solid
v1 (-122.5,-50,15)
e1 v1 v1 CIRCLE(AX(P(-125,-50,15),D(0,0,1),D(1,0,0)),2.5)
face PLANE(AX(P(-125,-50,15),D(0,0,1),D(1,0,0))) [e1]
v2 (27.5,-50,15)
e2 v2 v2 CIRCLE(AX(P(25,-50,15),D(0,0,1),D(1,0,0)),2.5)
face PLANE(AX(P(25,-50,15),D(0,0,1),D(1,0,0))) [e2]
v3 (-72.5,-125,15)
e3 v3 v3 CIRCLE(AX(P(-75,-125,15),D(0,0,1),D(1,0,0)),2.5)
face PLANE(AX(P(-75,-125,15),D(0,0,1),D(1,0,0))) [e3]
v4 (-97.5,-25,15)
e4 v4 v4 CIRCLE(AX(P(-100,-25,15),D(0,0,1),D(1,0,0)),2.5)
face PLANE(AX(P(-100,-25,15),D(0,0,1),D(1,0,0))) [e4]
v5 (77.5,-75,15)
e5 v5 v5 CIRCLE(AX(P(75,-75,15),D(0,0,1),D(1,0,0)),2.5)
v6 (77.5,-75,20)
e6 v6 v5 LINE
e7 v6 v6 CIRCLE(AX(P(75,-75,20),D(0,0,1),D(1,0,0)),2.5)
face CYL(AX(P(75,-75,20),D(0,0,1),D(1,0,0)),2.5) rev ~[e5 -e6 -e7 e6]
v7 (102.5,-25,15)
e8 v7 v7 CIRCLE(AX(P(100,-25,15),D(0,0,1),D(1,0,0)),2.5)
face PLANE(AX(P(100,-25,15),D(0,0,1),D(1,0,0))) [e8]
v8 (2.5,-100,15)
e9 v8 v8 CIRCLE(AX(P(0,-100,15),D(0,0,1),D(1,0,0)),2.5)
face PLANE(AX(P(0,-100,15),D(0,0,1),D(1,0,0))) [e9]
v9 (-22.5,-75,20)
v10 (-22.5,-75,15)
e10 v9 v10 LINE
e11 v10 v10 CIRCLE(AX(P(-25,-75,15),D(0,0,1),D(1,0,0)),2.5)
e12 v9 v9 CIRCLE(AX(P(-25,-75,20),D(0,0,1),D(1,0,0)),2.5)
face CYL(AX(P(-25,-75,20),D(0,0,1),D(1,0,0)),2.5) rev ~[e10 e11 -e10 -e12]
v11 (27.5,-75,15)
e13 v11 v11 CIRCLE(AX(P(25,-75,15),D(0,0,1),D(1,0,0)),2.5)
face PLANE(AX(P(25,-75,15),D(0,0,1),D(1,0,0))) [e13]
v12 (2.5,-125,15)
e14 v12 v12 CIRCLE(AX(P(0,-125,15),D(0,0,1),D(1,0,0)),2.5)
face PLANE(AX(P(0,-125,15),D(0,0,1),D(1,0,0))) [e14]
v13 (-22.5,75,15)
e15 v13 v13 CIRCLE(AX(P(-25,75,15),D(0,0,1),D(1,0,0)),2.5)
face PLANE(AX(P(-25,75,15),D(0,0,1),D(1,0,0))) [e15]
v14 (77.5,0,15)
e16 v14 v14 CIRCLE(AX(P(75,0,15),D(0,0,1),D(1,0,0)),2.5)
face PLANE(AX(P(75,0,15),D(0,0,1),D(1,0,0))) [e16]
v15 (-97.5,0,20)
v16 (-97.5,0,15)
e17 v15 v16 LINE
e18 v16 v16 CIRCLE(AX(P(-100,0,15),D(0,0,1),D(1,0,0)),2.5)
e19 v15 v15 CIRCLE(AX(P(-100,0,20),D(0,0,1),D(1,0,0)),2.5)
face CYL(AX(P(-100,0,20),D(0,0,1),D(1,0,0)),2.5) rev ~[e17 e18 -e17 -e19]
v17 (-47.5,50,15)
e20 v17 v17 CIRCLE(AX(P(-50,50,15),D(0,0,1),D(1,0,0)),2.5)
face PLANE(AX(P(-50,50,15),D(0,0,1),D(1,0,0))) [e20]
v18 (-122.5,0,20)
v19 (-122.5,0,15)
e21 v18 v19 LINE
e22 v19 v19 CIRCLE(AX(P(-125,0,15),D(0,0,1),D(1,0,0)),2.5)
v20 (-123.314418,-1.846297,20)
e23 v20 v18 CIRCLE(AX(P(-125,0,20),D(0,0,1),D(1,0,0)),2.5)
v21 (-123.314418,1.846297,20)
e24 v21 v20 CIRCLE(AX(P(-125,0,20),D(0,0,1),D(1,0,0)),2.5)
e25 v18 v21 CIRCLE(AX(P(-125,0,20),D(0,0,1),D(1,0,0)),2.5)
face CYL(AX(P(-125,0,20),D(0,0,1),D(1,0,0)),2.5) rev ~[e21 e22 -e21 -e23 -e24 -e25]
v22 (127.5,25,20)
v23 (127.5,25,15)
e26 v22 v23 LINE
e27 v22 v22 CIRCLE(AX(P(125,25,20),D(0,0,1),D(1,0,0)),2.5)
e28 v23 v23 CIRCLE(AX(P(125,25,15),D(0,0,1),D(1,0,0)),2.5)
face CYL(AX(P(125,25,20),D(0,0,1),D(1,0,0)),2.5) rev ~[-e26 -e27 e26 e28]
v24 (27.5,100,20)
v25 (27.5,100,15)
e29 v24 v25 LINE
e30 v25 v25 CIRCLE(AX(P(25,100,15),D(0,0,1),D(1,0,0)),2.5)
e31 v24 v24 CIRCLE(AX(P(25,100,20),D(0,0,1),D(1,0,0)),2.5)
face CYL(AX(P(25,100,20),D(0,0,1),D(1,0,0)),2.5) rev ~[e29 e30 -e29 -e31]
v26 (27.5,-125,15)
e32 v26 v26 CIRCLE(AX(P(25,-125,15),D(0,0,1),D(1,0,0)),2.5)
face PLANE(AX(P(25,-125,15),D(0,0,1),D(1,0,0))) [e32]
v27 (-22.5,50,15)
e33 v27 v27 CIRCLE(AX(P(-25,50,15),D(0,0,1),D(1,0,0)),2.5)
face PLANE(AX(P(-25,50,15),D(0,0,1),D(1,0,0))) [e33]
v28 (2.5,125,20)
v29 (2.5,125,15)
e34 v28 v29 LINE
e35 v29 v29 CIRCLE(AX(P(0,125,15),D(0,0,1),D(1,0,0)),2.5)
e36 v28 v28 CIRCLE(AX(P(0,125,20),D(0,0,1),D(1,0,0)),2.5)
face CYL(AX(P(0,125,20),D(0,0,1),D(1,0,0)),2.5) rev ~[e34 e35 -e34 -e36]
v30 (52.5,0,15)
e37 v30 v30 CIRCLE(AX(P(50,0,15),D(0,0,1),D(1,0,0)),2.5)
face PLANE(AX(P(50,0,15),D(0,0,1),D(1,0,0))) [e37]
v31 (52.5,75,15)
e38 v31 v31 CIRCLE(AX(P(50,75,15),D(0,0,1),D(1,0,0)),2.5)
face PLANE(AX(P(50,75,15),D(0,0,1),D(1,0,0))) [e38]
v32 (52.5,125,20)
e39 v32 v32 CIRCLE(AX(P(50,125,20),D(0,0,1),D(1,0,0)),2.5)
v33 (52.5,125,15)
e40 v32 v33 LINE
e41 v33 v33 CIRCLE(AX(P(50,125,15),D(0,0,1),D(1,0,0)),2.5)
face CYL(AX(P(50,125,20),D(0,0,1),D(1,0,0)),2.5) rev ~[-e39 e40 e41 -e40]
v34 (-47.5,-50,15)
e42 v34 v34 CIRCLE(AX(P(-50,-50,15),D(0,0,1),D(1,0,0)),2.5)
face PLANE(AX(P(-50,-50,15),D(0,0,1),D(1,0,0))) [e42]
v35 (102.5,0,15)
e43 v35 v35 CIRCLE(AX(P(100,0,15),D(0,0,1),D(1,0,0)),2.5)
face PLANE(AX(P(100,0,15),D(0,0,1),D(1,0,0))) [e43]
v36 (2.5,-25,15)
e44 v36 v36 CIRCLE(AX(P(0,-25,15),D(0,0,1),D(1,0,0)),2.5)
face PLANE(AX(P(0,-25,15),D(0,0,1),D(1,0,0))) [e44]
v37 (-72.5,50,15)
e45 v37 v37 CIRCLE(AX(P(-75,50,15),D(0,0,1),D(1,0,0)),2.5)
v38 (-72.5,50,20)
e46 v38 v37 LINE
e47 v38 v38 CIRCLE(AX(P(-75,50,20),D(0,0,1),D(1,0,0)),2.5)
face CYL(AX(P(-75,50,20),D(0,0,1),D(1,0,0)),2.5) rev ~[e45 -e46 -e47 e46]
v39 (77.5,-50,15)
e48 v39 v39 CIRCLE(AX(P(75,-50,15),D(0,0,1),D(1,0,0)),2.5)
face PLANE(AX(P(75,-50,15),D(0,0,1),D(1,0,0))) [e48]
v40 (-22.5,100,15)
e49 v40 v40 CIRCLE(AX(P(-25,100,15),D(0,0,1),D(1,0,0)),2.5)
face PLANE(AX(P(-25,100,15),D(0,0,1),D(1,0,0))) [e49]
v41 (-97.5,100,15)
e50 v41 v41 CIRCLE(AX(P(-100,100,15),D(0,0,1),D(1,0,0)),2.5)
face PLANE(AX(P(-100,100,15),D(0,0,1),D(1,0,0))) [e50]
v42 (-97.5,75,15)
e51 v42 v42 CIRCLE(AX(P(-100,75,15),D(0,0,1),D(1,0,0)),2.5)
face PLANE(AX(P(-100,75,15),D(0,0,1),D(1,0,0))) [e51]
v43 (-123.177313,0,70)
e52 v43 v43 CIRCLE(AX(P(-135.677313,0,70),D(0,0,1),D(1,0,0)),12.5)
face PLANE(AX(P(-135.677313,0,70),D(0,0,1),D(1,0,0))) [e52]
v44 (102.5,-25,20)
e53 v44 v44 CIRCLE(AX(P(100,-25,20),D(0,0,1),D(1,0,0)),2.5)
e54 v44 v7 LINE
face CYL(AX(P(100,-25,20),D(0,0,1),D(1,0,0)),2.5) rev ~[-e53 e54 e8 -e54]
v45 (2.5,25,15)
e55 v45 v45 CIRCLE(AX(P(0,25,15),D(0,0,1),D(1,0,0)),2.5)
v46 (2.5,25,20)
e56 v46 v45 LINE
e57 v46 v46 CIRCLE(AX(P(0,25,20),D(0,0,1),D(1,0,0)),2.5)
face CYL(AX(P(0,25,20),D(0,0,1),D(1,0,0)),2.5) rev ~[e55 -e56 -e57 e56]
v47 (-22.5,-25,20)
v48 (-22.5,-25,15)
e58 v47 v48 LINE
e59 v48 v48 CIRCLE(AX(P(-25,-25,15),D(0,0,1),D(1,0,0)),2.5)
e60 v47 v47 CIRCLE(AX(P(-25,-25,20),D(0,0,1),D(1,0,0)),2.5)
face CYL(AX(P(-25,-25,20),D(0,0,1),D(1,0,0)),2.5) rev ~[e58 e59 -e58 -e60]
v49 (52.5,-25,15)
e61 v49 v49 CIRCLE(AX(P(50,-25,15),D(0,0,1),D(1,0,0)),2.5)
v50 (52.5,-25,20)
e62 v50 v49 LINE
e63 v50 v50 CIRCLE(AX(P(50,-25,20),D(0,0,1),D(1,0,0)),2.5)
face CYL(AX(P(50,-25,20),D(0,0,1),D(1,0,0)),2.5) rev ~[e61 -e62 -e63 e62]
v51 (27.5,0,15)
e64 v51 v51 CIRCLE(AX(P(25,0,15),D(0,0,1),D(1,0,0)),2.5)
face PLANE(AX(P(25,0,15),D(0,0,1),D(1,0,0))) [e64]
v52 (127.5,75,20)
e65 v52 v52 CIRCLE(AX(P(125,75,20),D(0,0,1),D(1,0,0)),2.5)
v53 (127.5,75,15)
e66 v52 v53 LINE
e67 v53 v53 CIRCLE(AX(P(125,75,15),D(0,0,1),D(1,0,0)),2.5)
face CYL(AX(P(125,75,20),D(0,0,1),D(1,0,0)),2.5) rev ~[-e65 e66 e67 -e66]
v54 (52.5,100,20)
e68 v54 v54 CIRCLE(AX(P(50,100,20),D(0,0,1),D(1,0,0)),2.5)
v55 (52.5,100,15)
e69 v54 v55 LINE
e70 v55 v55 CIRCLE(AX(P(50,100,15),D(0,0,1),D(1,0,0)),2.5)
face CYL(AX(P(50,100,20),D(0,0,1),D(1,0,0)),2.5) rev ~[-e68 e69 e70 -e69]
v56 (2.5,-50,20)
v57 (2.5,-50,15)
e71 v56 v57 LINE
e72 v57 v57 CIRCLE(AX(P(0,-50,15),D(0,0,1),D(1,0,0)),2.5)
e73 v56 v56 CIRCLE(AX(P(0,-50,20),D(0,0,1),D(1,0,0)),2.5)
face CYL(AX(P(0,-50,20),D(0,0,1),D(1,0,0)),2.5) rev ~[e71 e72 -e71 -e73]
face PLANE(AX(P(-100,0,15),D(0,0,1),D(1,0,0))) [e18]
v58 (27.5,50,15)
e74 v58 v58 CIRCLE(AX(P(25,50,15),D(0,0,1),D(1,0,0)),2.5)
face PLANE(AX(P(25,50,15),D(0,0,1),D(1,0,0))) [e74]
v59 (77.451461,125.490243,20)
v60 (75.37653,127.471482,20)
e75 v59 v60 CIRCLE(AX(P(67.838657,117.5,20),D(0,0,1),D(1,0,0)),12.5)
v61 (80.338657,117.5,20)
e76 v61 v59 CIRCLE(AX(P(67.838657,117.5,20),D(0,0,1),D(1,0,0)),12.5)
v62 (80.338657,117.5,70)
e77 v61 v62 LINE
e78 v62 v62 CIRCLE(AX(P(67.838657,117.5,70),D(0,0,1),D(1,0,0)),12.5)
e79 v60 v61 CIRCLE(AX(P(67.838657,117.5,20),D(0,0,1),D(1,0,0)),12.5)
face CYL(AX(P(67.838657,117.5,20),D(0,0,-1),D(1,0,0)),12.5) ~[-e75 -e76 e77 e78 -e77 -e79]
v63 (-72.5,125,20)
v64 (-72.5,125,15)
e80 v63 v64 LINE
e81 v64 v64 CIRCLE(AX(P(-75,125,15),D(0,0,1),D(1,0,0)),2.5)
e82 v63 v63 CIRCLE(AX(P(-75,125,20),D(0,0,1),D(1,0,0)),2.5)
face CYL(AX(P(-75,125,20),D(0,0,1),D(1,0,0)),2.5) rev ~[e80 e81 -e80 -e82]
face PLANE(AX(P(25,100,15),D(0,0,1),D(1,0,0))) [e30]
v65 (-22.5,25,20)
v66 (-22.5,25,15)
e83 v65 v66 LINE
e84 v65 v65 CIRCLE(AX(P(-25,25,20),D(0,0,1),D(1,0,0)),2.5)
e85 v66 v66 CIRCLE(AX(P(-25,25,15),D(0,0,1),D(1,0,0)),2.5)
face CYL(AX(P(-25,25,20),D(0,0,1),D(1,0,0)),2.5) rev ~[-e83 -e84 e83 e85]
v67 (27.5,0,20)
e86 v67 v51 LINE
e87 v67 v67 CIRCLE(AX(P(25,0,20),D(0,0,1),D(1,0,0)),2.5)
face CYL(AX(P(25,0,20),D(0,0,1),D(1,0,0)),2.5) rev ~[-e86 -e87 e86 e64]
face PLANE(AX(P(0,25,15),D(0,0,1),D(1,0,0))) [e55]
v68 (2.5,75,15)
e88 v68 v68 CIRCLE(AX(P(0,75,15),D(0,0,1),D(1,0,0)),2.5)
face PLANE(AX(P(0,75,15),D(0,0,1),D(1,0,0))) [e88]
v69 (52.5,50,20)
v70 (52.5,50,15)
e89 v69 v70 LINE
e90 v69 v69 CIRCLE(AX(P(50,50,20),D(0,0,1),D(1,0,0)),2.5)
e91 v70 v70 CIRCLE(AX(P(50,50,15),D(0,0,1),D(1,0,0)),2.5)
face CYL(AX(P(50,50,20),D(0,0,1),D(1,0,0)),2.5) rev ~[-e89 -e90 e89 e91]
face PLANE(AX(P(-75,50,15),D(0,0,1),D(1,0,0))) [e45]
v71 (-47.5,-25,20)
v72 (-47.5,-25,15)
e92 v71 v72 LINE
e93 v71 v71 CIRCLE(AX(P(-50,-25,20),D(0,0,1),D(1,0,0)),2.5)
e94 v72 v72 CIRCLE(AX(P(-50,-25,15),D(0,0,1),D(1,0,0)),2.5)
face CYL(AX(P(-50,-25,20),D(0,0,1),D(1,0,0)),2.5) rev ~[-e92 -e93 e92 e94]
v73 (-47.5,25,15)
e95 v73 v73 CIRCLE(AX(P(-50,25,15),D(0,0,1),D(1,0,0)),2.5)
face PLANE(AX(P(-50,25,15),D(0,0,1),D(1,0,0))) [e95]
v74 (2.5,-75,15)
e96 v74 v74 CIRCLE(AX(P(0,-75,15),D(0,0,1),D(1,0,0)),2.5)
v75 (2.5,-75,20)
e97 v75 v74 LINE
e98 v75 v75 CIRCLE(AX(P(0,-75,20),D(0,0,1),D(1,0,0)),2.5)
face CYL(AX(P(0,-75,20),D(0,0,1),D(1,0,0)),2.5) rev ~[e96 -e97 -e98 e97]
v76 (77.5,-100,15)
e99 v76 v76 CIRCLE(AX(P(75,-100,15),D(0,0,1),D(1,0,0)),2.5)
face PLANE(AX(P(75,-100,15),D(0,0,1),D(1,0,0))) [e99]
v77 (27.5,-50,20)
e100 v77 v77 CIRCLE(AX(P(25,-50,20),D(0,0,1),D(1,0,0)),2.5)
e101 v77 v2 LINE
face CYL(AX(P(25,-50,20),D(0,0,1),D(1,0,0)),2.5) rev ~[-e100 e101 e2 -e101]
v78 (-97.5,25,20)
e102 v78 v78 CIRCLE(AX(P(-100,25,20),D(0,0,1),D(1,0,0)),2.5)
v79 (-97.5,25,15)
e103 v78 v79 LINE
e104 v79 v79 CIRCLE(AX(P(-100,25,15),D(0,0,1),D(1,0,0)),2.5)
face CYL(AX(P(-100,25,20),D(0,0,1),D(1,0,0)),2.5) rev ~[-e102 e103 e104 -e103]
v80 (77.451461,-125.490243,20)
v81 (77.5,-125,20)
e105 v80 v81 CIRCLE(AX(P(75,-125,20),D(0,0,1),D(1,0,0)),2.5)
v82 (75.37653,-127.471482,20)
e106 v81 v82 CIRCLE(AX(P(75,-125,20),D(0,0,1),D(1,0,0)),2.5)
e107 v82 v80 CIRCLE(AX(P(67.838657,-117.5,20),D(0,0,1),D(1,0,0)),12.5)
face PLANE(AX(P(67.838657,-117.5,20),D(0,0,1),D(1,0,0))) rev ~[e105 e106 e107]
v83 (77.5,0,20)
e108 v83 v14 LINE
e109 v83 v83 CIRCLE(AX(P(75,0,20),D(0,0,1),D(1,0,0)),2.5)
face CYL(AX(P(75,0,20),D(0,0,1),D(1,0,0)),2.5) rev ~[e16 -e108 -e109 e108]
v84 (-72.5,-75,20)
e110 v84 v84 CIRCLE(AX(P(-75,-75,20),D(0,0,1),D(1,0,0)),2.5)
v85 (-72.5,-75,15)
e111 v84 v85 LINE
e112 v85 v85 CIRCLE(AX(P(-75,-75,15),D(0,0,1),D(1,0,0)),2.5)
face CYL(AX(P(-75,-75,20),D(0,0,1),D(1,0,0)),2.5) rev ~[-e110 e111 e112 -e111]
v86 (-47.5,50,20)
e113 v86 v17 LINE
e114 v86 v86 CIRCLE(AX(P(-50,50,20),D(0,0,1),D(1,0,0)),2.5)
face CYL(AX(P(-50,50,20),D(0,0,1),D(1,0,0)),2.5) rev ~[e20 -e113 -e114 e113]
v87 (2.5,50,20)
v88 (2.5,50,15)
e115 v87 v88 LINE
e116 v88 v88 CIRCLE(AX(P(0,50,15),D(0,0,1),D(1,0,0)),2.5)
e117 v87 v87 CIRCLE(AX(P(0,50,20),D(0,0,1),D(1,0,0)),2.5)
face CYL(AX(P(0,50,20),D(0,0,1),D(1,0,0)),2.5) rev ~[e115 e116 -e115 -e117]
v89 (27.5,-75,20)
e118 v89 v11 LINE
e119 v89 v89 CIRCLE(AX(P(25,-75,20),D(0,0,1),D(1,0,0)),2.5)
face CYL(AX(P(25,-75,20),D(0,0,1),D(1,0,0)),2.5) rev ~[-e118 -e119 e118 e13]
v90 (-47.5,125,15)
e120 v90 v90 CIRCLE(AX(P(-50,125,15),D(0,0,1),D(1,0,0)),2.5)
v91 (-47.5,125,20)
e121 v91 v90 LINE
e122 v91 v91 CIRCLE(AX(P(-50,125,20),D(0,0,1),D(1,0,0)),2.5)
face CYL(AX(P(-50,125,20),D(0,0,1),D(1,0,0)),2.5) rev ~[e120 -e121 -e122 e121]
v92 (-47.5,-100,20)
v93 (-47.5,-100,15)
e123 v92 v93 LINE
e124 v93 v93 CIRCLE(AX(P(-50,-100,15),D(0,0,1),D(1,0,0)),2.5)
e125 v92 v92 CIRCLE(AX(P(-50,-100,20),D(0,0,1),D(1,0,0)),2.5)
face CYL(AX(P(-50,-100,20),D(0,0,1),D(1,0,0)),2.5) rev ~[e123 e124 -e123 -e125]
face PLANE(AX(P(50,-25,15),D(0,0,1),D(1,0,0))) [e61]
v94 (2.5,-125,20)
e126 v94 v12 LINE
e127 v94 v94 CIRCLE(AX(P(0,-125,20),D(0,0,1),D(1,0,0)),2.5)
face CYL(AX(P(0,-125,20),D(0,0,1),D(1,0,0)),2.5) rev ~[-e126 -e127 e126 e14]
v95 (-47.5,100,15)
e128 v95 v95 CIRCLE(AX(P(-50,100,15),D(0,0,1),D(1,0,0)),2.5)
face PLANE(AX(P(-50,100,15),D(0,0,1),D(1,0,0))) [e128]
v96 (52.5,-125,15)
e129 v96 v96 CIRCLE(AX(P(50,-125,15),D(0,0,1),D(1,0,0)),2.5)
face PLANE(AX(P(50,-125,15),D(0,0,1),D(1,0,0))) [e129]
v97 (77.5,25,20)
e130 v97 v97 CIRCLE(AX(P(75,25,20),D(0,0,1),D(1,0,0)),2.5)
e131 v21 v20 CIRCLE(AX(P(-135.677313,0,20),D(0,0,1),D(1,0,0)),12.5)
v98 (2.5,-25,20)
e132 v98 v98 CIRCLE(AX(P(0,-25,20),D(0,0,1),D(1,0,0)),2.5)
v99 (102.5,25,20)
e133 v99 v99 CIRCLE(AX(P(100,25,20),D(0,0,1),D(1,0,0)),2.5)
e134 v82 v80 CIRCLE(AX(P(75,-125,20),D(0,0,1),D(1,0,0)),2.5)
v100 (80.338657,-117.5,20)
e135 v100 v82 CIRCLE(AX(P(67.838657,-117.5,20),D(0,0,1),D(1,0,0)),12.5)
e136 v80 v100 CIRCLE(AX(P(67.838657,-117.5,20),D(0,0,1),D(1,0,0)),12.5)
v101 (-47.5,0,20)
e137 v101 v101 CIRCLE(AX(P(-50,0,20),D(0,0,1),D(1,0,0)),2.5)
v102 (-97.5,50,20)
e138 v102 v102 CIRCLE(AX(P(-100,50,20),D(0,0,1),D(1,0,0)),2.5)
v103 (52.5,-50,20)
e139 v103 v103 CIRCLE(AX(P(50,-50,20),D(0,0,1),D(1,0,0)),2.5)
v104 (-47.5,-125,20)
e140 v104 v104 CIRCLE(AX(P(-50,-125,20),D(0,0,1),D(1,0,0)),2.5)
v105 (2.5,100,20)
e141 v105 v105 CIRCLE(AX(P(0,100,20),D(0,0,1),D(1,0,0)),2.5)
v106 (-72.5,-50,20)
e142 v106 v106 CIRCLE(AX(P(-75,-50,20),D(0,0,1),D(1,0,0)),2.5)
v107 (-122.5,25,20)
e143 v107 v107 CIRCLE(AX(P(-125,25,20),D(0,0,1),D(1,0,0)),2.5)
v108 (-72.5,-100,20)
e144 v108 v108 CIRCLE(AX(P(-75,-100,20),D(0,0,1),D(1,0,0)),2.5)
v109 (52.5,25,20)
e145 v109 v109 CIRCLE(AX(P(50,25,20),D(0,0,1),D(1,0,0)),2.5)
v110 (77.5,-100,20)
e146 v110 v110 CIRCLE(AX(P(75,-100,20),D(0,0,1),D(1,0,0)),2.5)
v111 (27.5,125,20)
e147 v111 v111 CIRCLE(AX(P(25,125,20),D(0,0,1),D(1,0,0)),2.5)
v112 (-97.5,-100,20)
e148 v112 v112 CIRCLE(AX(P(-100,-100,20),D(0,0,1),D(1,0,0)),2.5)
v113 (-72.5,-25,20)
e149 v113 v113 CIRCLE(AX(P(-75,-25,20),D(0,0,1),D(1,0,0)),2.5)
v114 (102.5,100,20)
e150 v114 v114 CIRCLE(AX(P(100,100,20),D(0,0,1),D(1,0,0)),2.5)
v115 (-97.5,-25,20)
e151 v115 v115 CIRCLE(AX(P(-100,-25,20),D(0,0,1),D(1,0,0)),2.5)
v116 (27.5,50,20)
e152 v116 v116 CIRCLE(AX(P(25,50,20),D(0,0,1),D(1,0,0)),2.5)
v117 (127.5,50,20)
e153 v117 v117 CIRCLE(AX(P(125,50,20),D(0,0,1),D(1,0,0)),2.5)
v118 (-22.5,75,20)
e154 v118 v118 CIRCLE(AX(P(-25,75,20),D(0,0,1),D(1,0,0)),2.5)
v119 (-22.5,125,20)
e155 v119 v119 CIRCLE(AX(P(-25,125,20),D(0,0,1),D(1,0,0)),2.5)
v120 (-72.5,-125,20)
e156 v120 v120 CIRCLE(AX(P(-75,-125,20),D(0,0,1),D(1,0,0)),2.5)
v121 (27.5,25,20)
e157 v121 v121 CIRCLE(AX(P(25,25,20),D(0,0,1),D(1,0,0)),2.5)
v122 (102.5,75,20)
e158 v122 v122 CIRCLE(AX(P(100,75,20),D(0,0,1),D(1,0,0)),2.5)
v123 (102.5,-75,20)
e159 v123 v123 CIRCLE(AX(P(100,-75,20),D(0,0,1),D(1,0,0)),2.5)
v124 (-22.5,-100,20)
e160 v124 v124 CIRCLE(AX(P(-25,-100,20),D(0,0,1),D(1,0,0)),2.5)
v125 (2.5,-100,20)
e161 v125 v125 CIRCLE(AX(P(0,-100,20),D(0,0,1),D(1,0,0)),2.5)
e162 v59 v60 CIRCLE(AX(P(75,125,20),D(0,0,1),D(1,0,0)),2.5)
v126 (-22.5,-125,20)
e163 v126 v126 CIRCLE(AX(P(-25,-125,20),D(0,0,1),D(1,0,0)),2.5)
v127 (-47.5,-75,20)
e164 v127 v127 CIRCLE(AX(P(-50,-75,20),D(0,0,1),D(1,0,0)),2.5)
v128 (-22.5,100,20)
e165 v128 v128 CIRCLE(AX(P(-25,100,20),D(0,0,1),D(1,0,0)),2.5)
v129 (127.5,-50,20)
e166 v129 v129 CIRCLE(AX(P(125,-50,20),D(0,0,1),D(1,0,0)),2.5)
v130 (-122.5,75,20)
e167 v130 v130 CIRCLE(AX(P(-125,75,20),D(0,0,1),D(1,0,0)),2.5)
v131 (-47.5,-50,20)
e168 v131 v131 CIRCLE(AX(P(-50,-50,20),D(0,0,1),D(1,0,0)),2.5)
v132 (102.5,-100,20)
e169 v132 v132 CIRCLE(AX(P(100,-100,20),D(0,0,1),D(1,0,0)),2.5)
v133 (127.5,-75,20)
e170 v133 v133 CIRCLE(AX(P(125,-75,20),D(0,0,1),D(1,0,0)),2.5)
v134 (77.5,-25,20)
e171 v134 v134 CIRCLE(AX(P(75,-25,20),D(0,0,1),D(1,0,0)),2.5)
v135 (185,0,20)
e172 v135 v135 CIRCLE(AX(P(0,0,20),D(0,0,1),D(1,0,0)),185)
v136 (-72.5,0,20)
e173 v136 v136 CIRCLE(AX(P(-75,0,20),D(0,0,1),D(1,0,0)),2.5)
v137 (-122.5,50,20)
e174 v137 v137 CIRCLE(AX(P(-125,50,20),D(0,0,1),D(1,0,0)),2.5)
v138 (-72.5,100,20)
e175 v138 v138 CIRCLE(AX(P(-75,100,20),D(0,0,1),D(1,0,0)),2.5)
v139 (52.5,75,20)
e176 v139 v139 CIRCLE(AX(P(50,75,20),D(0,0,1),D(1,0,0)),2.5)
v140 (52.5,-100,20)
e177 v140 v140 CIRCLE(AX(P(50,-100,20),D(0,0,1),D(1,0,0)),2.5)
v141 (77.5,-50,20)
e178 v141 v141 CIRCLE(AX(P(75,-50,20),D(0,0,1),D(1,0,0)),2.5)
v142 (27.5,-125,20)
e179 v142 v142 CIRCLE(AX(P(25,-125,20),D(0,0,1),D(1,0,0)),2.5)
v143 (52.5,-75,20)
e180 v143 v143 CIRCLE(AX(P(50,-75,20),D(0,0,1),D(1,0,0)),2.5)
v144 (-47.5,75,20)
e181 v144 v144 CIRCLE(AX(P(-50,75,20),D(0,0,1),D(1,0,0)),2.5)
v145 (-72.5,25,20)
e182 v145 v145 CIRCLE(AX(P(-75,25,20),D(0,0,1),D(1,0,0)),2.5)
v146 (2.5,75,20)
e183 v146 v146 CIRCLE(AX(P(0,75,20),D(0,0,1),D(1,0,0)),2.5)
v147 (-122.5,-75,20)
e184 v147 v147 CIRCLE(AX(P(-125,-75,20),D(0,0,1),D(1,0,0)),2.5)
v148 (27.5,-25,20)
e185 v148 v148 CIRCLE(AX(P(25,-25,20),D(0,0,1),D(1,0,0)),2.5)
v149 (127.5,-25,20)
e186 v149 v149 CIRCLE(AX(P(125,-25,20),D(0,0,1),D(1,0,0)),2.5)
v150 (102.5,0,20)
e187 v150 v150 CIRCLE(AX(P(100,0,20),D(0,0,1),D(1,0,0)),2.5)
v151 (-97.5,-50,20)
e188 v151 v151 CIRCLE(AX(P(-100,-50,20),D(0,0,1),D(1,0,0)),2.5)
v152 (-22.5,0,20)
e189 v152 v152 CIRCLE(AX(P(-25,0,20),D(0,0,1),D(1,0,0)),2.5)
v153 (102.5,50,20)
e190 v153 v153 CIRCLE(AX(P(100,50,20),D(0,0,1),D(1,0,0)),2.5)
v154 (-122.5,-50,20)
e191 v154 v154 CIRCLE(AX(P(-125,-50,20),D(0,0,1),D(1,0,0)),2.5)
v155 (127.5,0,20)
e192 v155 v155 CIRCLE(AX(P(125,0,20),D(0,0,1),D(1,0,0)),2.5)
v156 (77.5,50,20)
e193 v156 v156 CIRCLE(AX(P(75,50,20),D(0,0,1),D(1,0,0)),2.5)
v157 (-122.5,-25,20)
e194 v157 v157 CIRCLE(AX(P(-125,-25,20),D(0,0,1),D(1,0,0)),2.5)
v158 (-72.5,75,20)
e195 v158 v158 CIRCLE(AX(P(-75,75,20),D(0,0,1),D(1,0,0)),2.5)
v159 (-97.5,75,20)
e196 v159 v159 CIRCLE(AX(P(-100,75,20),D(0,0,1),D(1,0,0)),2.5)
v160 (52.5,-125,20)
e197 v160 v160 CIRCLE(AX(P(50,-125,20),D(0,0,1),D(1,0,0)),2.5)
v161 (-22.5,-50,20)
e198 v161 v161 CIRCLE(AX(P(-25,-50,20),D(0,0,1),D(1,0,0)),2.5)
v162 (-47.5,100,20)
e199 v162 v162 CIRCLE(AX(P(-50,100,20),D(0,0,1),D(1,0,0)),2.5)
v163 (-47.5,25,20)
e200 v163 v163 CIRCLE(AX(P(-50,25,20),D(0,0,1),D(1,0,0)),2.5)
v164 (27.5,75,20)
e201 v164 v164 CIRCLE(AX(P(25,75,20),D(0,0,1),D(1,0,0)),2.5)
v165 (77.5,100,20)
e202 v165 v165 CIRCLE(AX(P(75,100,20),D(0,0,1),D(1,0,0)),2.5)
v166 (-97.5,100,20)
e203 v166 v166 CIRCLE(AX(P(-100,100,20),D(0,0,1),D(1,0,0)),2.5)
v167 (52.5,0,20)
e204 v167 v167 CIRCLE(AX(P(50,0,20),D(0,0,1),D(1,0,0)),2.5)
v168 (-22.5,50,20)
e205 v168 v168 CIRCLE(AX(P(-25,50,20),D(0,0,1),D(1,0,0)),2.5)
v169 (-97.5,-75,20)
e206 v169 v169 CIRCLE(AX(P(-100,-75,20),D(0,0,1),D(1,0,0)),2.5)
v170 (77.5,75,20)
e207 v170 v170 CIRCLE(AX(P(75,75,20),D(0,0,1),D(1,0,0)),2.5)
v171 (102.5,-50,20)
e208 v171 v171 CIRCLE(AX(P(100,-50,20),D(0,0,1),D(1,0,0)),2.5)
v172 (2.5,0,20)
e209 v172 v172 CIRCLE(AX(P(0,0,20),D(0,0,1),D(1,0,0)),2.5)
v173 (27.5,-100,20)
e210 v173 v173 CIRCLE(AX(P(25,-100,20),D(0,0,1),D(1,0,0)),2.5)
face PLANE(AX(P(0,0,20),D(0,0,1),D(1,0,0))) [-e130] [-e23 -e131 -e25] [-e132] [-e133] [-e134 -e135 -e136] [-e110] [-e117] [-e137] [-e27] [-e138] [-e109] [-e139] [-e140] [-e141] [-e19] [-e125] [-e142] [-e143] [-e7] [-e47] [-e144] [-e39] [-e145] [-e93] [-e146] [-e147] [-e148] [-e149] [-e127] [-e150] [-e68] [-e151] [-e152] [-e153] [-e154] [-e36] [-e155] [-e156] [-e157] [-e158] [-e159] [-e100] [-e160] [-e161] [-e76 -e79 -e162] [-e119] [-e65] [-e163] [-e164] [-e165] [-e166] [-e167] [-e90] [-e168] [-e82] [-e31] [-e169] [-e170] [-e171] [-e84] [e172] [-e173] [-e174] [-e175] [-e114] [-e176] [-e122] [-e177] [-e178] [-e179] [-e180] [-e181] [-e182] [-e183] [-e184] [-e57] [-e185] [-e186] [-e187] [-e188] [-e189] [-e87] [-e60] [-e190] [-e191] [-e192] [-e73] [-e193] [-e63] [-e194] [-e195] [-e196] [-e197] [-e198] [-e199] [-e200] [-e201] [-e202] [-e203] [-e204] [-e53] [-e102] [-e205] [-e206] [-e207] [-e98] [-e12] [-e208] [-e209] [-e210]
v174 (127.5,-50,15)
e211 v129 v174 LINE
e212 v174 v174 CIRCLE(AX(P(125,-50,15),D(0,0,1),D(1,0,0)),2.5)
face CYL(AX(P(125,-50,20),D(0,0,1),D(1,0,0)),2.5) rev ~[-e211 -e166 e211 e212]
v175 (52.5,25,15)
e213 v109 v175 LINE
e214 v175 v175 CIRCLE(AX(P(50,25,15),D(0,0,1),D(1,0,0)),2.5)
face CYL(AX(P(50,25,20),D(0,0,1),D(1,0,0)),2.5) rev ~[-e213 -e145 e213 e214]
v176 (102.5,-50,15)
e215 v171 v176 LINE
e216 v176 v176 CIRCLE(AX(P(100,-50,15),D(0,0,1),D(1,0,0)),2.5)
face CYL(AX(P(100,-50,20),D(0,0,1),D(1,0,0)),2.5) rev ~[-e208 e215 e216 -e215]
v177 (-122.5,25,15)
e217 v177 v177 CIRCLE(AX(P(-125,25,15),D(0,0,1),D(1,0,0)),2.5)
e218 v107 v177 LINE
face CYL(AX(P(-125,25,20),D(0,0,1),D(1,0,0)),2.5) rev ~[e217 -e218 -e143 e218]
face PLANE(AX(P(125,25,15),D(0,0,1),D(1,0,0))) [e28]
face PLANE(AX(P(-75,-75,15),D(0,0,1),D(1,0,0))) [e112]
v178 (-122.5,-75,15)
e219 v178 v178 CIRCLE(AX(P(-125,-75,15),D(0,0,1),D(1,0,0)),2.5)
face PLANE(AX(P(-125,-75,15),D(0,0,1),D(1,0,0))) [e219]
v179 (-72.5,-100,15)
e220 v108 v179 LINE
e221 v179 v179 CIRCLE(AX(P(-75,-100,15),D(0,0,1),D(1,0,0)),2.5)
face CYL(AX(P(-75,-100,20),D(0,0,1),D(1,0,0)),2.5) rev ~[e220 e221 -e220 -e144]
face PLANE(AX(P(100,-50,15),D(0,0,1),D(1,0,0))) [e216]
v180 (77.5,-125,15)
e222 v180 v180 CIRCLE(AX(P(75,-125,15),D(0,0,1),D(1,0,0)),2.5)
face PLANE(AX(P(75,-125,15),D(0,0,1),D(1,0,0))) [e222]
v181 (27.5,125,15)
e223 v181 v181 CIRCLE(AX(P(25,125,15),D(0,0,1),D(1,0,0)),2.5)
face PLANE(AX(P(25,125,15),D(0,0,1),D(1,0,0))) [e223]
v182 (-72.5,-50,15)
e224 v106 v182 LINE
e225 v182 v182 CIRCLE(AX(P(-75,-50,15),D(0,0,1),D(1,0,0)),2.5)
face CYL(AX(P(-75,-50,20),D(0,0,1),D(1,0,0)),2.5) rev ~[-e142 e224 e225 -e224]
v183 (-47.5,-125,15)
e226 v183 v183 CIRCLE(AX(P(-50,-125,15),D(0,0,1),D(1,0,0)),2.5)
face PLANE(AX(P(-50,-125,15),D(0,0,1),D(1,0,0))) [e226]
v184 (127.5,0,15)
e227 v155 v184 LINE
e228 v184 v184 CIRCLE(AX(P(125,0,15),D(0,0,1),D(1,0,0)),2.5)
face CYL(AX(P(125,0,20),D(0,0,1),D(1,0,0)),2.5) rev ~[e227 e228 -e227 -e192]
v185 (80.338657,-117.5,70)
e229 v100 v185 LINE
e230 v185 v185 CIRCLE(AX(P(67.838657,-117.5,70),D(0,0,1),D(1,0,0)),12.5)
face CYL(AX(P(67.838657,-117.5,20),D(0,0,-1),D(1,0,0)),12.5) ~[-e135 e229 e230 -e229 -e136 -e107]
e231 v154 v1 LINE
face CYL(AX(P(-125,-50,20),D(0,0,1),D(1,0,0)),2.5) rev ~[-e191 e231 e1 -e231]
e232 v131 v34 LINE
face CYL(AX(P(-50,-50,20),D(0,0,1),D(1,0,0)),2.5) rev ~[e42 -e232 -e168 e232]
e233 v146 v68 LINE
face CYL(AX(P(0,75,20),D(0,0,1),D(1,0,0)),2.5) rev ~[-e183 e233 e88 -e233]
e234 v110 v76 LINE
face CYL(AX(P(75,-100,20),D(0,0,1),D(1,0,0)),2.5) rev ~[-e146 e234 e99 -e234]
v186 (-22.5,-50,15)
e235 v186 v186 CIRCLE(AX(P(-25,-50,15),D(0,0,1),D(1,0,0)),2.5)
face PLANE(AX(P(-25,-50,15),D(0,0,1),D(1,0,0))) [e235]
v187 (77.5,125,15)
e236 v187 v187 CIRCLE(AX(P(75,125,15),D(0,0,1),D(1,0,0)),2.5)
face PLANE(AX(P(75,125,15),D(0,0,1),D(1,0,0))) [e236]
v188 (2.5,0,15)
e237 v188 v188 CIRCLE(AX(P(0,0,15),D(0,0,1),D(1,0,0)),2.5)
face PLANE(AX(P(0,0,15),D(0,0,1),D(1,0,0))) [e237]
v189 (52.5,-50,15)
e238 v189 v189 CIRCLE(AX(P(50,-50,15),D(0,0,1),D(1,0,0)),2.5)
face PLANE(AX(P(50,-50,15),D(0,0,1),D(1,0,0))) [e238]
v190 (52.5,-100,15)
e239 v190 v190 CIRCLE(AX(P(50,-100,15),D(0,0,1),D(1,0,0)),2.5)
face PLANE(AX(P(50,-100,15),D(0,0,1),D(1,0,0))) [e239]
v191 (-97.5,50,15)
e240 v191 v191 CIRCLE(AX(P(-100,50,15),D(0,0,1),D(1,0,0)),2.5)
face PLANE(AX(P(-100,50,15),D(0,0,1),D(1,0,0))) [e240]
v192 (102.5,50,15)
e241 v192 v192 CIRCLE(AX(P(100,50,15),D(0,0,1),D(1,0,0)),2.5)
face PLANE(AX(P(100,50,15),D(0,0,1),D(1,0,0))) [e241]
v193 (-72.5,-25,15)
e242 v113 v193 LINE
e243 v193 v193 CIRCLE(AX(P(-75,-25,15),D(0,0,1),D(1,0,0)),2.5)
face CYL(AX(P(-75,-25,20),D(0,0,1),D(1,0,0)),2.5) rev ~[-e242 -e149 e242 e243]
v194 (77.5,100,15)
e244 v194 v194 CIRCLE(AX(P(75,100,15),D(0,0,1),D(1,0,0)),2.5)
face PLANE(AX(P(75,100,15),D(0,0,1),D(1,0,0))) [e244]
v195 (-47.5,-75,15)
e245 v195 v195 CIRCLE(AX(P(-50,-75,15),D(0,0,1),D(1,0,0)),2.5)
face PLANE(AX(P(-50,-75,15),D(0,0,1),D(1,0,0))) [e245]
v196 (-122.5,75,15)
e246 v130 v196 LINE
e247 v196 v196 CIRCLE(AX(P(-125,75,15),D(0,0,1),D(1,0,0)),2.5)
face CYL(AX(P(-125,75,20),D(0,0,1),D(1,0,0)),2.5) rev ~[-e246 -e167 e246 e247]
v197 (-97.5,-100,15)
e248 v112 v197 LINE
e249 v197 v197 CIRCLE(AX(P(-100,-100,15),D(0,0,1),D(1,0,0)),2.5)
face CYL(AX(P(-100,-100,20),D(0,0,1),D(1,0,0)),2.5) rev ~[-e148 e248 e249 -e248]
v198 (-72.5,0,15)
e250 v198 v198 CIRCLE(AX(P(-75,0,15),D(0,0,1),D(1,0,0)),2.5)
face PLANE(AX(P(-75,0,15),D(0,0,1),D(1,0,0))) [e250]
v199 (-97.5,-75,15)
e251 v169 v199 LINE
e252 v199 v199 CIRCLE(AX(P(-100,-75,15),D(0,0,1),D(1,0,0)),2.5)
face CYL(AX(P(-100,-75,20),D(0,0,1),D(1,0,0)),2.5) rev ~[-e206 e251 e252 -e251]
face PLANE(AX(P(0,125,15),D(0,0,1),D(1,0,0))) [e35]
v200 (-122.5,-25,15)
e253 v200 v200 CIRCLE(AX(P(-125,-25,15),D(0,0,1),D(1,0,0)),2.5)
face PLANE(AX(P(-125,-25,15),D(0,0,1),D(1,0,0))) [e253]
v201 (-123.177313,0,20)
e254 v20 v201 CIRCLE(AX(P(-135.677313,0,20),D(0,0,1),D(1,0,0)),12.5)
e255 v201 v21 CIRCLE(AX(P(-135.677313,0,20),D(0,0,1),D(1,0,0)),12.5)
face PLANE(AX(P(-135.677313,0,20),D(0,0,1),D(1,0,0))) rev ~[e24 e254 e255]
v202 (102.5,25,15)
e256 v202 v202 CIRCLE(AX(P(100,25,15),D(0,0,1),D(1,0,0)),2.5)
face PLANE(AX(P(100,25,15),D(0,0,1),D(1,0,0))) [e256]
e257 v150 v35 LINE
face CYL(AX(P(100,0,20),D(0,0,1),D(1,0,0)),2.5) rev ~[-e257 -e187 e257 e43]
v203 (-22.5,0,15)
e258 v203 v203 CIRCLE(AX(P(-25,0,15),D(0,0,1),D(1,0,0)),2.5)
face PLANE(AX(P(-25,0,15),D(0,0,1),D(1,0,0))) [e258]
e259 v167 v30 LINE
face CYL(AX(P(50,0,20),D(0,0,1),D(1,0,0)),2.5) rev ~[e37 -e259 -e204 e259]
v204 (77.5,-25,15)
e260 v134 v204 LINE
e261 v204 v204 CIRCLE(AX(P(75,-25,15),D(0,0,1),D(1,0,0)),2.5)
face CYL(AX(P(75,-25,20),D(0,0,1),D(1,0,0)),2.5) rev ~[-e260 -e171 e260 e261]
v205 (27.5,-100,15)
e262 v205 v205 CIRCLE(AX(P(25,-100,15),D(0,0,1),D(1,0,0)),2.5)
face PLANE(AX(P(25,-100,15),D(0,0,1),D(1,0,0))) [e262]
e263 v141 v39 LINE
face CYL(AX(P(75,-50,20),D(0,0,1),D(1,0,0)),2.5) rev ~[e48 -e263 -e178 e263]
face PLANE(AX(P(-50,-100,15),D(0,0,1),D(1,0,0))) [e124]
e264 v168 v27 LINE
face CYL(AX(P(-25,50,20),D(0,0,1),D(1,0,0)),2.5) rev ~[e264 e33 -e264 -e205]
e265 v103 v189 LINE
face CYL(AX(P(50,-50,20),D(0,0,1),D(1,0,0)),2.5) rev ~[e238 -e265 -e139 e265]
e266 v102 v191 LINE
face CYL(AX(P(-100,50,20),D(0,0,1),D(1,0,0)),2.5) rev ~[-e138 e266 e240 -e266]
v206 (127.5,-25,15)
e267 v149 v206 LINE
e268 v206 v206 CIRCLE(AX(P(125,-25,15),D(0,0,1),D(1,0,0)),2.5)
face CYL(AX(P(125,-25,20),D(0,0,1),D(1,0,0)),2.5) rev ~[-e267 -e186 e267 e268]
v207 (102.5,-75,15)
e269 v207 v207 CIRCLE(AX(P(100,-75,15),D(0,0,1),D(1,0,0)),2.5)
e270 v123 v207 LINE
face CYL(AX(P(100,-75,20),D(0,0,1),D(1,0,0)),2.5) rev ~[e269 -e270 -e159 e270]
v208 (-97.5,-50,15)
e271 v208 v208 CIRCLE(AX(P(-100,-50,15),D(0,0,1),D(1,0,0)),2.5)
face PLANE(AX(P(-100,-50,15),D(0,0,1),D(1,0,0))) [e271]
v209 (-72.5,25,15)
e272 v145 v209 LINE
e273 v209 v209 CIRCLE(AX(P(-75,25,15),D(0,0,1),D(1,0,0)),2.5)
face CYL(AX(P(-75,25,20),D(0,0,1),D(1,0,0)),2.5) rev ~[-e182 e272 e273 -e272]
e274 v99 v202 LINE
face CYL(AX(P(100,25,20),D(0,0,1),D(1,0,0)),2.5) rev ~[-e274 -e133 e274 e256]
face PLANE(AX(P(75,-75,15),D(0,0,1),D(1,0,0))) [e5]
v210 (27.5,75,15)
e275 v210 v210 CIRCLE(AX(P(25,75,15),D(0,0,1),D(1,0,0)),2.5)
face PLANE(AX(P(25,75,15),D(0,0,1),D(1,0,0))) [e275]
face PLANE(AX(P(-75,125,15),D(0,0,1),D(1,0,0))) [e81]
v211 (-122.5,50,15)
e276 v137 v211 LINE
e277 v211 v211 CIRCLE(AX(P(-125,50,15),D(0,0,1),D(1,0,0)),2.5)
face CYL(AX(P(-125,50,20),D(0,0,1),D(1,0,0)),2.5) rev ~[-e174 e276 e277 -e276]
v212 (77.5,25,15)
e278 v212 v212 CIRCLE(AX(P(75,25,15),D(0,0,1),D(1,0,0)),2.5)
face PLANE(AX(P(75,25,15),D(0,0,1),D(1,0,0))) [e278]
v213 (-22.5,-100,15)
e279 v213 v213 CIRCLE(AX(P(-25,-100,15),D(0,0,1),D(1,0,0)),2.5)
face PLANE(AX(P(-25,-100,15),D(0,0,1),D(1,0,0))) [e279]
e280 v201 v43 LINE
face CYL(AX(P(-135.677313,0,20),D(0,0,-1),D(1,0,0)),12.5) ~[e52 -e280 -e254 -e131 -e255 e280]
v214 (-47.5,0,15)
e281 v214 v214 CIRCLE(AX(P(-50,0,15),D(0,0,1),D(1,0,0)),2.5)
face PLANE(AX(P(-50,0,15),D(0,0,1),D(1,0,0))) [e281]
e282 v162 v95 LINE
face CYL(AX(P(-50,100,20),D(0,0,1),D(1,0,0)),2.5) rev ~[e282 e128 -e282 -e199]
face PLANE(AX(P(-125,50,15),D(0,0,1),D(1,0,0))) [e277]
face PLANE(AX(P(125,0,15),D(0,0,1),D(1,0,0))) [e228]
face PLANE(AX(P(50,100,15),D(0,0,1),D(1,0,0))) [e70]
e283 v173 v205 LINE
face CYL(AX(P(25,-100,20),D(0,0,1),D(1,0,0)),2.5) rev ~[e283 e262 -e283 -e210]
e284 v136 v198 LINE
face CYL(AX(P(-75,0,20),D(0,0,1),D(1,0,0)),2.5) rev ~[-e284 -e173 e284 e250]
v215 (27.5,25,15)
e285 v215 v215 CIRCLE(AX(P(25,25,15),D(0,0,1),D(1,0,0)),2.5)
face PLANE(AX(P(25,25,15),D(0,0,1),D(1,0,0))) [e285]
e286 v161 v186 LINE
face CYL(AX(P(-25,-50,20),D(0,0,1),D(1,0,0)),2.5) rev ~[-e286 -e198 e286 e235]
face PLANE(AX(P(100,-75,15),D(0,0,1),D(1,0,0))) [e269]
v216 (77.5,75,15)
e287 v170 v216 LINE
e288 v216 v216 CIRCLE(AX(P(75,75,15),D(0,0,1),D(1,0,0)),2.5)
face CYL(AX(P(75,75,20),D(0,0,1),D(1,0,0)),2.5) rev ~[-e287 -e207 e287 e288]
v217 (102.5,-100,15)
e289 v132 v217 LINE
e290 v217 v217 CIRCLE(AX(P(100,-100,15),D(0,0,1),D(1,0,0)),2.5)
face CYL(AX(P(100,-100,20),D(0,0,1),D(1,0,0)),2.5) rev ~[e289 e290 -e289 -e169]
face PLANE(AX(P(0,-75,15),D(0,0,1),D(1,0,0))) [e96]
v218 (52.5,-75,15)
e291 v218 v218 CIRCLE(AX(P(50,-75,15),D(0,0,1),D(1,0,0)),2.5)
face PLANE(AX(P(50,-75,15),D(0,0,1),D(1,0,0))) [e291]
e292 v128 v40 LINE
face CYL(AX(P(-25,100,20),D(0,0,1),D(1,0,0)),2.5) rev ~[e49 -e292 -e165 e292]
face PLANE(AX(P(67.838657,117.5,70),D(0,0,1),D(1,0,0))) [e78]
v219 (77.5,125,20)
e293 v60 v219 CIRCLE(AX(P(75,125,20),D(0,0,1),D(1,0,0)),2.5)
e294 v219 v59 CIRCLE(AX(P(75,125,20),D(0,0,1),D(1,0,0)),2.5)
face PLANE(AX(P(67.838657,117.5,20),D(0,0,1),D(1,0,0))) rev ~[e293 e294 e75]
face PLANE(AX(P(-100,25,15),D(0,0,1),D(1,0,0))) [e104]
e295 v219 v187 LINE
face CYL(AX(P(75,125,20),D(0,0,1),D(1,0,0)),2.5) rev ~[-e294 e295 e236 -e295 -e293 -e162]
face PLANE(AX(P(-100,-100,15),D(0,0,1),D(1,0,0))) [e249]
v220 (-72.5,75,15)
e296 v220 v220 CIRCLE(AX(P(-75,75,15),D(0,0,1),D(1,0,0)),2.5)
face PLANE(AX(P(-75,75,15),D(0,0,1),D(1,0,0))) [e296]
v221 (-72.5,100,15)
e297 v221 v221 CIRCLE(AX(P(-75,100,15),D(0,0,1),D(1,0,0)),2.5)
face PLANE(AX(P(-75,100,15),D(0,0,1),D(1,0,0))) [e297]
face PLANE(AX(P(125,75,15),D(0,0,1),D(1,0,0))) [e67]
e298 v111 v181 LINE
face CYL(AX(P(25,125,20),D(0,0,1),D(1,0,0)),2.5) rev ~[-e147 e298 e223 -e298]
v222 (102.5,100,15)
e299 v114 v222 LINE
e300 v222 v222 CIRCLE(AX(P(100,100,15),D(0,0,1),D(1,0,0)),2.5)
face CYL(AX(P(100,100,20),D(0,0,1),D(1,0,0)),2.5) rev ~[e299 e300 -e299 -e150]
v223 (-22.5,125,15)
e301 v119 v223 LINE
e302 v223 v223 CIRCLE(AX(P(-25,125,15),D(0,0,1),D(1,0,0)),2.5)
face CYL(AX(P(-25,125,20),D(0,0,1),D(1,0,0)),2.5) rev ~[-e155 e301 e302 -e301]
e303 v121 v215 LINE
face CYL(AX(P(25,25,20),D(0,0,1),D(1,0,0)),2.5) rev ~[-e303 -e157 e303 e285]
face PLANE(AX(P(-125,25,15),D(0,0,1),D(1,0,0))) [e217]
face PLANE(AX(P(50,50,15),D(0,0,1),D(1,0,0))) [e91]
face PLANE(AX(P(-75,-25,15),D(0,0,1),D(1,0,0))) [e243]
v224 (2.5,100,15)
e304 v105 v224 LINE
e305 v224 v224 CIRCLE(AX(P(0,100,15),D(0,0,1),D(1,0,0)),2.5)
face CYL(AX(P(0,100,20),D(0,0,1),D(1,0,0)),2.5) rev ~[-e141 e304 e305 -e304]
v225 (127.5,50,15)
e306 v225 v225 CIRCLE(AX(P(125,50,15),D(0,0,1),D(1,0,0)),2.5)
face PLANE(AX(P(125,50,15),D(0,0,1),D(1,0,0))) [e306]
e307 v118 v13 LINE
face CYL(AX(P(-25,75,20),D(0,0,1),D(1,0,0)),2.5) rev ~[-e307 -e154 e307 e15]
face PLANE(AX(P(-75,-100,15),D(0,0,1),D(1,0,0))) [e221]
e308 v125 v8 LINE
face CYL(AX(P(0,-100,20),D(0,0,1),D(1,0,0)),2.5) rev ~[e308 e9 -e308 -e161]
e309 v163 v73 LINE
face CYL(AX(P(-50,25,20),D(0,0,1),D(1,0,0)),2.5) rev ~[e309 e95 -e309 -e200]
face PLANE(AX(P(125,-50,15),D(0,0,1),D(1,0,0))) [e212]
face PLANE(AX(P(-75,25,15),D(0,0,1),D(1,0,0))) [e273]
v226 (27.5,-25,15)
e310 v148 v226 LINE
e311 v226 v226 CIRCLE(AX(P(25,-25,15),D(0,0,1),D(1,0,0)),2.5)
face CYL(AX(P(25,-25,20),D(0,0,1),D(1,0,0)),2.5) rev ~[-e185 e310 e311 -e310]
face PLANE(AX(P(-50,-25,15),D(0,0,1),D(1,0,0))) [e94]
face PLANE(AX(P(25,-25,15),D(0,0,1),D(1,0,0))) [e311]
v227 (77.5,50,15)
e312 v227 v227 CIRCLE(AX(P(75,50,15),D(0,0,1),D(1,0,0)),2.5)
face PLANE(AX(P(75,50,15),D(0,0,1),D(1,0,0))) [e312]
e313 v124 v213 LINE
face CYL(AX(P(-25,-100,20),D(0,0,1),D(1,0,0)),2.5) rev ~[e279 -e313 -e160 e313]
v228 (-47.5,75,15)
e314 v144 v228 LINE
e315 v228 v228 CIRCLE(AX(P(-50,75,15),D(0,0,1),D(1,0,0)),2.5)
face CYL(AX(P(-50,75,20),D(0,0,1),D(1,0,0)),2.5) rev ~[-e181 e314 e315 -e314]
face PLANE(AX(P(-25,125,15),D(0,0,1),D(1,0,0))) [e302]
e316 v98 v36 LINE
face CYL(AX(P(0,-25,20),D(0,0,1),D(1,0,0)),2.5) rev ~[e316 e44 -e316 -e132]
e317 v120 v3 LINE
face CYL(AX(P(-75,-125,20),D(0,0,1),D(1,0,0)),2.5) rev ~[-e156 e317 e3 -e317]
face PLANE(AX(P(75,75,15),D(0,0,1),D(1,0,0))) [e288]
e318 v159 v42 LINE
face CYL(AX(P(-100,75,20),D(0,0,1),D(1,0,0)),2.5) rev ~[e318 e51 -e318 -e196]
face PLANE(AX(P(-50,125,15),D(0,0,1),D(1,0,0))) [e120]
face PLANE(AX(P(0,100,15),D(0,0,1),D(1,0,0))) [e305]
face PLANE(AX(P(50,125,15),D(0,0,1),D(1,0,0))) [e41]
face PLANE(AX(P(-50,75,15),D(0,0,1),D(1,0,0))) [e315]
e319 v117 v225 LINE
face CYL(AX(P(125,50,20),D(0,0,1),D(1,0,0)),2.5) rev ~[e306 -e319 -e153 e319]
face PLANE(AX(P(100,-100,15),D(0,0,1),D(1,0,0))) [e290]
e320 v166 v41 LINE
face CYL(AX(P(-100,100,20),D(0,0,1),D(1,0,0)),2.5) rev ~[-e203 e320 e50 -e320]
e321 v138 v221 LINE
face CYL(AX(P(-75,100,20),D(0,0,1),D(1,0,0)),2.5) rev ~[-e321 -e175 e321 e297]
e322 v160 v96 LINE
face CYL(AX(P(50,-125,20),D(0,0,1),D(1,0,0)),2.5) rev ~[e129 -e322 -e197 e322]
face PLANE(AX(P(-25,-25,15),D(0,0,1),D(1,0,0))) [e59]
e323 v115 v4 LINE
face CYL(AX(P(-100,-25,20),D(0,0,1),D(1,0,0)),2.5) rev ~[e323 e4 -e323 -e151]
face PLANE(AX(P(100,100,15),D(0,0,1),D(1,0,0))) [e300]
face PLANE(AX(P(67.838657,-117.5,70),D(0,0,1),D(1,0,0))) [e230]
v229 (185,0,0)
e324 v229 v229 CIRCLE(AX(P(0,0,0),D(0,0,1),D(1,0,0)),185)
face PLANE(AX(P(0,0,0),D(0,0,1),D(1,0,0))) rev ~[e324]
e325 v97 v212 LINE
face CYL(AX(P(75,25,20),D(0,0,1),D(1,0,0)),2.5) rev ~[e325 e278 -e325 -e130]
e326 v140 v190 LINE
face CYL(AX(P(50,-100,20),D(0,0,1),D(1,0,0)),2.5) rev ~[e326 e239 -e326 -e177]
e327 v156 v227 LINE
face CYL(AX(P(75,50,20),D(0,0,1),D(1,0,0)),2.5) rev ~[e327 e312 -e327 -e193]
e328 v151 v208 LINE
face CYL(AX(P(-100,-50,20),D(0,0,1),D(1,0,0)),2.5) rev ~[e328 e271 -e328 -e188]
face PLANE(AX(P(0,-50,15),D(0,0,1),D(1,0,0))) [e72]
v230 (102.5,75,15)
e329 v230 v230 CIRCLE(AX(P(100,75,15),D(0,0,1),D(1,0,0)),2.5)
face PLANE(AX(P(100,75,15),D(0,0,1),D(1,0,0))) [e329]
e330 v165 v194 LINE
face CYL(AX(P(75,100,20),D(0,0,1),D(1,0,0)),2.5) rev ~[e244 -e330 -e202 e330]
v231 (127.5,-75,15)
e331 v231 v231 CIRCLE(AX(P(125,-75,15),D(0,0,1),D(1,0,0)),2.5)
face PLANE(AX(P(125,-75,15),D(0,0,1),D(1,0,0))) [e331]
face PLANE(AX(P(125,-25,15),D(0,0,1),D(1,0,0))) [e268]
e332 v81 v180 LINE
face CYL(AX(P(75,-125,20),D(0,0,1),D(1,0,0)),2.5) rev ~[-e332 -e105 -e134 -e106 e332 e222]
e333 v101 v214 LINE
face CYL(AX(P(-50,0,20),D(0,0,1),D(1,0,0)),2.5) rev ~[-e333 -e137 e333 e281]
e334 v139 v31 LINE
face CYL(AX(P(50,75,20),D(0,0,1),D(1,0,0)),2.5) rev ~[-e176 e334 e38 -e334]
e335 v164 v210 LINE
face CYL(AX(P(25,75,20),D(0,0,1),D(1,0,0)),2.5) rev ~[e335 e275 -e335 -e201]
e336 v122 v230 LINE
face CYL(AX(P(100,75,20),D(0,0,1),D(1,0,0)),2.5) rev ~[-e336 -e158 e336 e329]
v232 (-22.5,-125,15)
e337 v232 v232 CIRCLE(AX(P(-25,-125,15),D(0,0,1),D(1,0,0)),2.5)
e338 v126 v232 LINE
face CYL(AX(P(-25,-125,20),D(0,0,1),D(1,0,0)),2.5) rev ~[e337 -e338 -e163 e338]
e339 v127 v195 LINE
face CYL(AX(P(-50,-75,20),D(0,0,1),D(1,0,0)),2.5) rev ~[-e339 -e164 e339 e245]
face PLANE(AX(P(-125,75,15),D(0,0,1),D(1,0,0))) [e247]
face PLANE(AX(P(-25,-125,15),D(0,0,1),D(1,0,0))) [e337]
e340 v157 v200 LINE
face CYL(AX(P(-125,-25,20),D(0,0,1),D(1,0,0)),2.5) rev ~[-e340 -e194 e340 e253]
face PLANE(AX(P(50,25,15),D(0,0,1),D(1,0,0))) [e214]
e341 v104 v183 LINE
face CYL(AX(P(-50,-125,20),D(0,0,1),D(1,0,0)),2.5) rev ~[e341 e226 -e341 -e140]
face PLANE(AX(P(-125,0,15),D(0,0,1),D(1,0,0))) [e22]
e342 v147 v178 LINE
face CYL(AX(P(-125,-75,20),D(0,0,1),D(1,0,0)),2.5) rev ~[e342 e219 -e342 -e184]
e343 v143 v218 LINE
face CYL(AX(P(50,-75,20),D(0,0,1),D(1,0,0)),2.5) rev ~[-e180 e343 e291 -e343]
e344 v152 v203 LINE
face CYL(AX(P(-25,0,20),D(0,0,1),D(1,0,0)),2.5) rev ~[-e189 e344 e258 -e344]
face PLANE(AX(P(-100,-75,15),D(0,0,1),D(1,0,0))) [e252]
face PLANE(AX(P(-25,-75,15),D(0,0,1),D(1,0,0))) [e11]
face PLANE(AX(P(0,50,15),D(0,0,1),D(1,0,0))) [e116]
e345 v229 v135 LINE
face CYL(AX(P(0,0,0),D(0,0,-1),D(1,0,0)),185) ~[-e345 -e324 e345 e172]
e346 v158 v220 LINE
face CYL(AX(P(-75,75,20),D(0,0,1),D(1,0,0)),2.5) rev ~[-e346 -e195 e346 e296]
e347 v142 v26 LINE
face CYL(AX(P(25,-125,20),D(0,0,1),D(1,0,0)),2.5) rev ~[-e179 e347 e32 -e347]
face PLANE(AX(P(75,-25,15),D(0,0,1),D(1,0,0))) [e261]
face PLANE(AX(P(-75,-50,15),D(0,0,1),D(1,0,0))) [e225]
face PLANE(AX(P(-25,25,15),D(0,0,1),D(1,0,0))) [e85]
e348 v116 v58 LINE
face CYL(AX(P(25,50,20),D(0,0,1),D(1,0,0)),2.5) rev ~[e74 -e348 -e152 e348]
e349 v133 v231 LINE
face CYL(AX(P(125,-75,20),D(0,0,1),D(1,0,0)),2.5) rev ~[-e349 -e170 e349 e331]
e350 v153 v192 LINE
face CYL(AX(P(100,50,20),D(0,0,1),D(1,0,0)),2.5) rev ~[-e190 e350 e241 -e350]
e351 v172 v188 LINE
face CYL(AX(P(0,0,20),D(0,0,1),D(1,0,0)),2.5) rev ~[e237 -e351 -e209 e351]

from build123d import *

# Parameters (mm, degrees)
F0_R     = 185
F1_DEPTH = 20
F4_R     = 2.5
F5_DEPTH = 5
F6_R     = 12.5
F7_DEPTH = 50


# Not quite as in the source:
# - the program builds the solid bodies; features that only make, move or delete a surface that nothing else refers to are left out


with BuildPart() as f1:
    # F0 (on Top) → F1 (new body)
    with BuildSketch(Plane.XY):
        Circle(F0_R)
    extrude(amount=F1_DEPTH)

    # F4 (on face) → F5 (cut)
    with BuildSketch(Plane.XY.offset(20)):
        Circle(F4_R)
        with Locations((0, 25)):
            Circle(F4_R)
        with Locations((0, 50)):
            Circle(F4_R)
        with Locations((0, 75)):
            Circle(F4_R)
        with Locations((0, 100)):
            Circle(F4_R)
        with Locations((0, 125)):
            Circle(F4_R)
        with Locations((25, 0)):
            Circle(F4_R)
        with Locations((25, 25)):
            Circle(F4_R)
        with Locations((25, 50)):
            Circle(F4_R)
        with Locations((25, 75)):
            Circle(F4_R)
        with Locations((25, 100)):
            Circle(F4_R)
        with Locations((25, 125)):
            Circle(F4_R)
        with Locations((50, 0)):
            Circle(F4_R)
        with Locations((50, 25)):
            Circle(F4_R)
        with Locations((50, 50)):
            Circle(F4_R)
        with Locations((50, 75)):
            Circle(F4_R)
        with Locations((50, 100)):
            Circle(F4_R)
        with Locations((50, 125)):
            Circle(F4_R)
        with Locations((75, 0)):
            Circle(F4_R)
        with Locations((75, 25)):
            Circle(F4_R)
        with Locations((75, 50)):
            Circle(F4_R)
        with Locations((75, 75)):
            Circle(F4_R)
        with Locations((75, 100)):
            Circle(F4_R)
        with Locations((75, 125)):
            Circle(F4_R)
        with Locations((100, 0)):
            Circle(F4_R)
        with Locations((100, 25)):
            Circle(F4_R)
        with Locations((100, 50)):
            Circle(F4_R)
        with Locations((100, 75)):
            Circle(F4_R)
        with Locations((100, 100)):
            Circle(F4_R)
        with Locations((125, 0)):
            Circle(F4_R)
        with Locations((125, 25)):
            Circle(F4_R)
        with Locations((125, 50)):
            Circle(F4_R)
        with Locations((125, 75)):
            Circle(F4_R)
        with Locations((75, -25)):
            Circle(F4_R)
        with Locations((100, -50)):
            Circle(F4_R)
        with Locations((0, -100)):
            Circle(F4_R)
        with Locations((100, -100)):
            Circle(F4_R)
        with Locations((75, -100)):
            Circle(F4_R)
        with Locations((125, -50)):
            Circle(F4_R)
        with Locations((75, -125)):
            Circle(F4_R)
        with Locations((25, -50)):
            Circle(F4_R)
        with Locations((0, -75)):
            Circle(F4_R)
        with Locations((100, -75)):
            Circle(F4_R)
        with Locations((100, -25)):
            Circle(F4_R)
        with Locations((50, -125)):
            Circle(F4_R)
        with Locations((125, -25)):
            Circle(F4_R)
        with Locations((50, -75)):
            Circle(F4_R)
        with Locations((25, -25)):
            Circle(F4_R)
        with Locations((75, -75)):
            Circle(F4_R)
        with Locations((75, -50)):
            Circle(F4_R)
        with Locations((125, -75)):
            Circle(F4_R)
        with Locations((0, -125)):
            Circle(F4_R)
        with Locations((25, -75)):
            Circle(F4_R)
        with Locations((50, -100)):
            Circle(F4_R)
        with Locations((25, -125)):
            Circle(F4_R)
        with Locations((0, -50)):
            Circle(F4_R)
        with Locations((25, -100)):
            Circle(F4_R)
        with Locations((50, -25)):
            Circle(F4_R)
        with Locations((50, -50)):
            Circle(F4_R)
        with Locations((0, -25)):
            Circle(F4_R)
        with Locations((-25, -75)):
            Circle(F4_R)
        with Locations((-50, -100)):
            Circle(F4_R)
        with Locations((-100, 0)):
            Circle(F4_R)
        with Locations((-100, -100)):
            Circle(F4_R)
        with Locations((-100, -75)):
            Circle(F4_R)
        with Locations((-50, -125)):
            Circle(F4_R)
        with Locations((-125, -75)):
            Circle(F4_R)
        with Locations((-50, -25)):
            Circle(F4_R)
        with Locations((-75, 0)):
            Circle(F4_R)
        with Locations((-75, -100)):
            Circle(F4_R)
        with Locations((-25, -100)):
            Circle(F4_R)
        with Locations((-125, -50)):
            Circle(F4_R)
        with Locations((-25, -125)):
            Circle(F4_R)
        with Locations((-75, -50)):
            Circle(F4_R)
        with Locations((-25, -25)):
            Circle(F4_R)
        with Locations((-75, -75)):
            Circle(F4_R)
        with Locations((-50, -75)):
            Circle(F4_R)
        with Locations((-75, -125)):
            Circle(F4_R)
        with Locations((-125, 0)):
            Circle(F4_R)
        with Locations((-75, -25)):
            Circle(F4_R)
        with Locations((-100, -50)):
            Circle(F4_R)
        with Locations((-125, -25)):
            Circle(F4_R)
        with Locations((-50, 0)):
            Circle(F4_R)
        with Locations((-100, -25)):
            Circle(F4_R)
        with Locations((-25, -50)):
            Circle(F4_R)
        with Locations((-50, -50)):
            Circle(F4_R)
        with Locations((-25, 0)):
            Circle(F4_R)
        with Locations((-75, 25)):
            Circle(F4_R)
        with Locations((-100, 50)):
            Circle(F4_R)
        with Locations((-100, 100)):
            Circle(F4_R)
        with Locations((-75, 100)):
            Circle(F4_R)
        with Locations((-125, 50)):
            Circle(F4_R)
        with Locations((-75, 125)):
            Circle(F4_R)
        with Locations((-25, 50)):
            Circle(F4_R)
        with Locations((-100, 75)):
            Circle(F4_R)
        with Locations((-100, 25)):
            Circle(F4_R)
        with Locations((-50, 125)):
            Circle(F4_R)
        with Locations((-125, 25)):
            Circle(F4_R)
        with Locations((-50, 75)):
            Circle(F4_R)
        with Locations((-25, 25)):
            Circle(F4_R)
        with Locations((-75, 75)):
            Circle(F4_R)
        with Locations((-75, 50)):
            Circle(F4_R)
        with Locations((-125, 75)):
            Circle(F4_R)
        with Locations((-25, 75)):
            Circle(F4_R)
        with Locations((-50, 100)):
            Circle(F4_R)
        with Locations((-25, 125)):
            Circle(F4_R)
        with Locations((-25, 100)):
            Circle(F4_R)
        with Locations((-50, 25)):
            Circle(F4_R)
        with Locations((-50, 50)):
            Circle(F4_R)
    extrude(amount=-F5_DEPTH, mode=Mode.SUBTRACT)

    # F6 (on face) → F7 (join)
    with BuildSketch(Plane.XY.offset(20)):
        with Locations((-135.6773132596, 0)):
            Circle(F6_R)
        with Locations((67.8386566298, -117.5)):
            Circle(F6_R)
        with Locations((67.8386566298, 117.5)):
            Circle(F6_R)
    extrude(amount=F7_DEPTH)


solid = f1.part
